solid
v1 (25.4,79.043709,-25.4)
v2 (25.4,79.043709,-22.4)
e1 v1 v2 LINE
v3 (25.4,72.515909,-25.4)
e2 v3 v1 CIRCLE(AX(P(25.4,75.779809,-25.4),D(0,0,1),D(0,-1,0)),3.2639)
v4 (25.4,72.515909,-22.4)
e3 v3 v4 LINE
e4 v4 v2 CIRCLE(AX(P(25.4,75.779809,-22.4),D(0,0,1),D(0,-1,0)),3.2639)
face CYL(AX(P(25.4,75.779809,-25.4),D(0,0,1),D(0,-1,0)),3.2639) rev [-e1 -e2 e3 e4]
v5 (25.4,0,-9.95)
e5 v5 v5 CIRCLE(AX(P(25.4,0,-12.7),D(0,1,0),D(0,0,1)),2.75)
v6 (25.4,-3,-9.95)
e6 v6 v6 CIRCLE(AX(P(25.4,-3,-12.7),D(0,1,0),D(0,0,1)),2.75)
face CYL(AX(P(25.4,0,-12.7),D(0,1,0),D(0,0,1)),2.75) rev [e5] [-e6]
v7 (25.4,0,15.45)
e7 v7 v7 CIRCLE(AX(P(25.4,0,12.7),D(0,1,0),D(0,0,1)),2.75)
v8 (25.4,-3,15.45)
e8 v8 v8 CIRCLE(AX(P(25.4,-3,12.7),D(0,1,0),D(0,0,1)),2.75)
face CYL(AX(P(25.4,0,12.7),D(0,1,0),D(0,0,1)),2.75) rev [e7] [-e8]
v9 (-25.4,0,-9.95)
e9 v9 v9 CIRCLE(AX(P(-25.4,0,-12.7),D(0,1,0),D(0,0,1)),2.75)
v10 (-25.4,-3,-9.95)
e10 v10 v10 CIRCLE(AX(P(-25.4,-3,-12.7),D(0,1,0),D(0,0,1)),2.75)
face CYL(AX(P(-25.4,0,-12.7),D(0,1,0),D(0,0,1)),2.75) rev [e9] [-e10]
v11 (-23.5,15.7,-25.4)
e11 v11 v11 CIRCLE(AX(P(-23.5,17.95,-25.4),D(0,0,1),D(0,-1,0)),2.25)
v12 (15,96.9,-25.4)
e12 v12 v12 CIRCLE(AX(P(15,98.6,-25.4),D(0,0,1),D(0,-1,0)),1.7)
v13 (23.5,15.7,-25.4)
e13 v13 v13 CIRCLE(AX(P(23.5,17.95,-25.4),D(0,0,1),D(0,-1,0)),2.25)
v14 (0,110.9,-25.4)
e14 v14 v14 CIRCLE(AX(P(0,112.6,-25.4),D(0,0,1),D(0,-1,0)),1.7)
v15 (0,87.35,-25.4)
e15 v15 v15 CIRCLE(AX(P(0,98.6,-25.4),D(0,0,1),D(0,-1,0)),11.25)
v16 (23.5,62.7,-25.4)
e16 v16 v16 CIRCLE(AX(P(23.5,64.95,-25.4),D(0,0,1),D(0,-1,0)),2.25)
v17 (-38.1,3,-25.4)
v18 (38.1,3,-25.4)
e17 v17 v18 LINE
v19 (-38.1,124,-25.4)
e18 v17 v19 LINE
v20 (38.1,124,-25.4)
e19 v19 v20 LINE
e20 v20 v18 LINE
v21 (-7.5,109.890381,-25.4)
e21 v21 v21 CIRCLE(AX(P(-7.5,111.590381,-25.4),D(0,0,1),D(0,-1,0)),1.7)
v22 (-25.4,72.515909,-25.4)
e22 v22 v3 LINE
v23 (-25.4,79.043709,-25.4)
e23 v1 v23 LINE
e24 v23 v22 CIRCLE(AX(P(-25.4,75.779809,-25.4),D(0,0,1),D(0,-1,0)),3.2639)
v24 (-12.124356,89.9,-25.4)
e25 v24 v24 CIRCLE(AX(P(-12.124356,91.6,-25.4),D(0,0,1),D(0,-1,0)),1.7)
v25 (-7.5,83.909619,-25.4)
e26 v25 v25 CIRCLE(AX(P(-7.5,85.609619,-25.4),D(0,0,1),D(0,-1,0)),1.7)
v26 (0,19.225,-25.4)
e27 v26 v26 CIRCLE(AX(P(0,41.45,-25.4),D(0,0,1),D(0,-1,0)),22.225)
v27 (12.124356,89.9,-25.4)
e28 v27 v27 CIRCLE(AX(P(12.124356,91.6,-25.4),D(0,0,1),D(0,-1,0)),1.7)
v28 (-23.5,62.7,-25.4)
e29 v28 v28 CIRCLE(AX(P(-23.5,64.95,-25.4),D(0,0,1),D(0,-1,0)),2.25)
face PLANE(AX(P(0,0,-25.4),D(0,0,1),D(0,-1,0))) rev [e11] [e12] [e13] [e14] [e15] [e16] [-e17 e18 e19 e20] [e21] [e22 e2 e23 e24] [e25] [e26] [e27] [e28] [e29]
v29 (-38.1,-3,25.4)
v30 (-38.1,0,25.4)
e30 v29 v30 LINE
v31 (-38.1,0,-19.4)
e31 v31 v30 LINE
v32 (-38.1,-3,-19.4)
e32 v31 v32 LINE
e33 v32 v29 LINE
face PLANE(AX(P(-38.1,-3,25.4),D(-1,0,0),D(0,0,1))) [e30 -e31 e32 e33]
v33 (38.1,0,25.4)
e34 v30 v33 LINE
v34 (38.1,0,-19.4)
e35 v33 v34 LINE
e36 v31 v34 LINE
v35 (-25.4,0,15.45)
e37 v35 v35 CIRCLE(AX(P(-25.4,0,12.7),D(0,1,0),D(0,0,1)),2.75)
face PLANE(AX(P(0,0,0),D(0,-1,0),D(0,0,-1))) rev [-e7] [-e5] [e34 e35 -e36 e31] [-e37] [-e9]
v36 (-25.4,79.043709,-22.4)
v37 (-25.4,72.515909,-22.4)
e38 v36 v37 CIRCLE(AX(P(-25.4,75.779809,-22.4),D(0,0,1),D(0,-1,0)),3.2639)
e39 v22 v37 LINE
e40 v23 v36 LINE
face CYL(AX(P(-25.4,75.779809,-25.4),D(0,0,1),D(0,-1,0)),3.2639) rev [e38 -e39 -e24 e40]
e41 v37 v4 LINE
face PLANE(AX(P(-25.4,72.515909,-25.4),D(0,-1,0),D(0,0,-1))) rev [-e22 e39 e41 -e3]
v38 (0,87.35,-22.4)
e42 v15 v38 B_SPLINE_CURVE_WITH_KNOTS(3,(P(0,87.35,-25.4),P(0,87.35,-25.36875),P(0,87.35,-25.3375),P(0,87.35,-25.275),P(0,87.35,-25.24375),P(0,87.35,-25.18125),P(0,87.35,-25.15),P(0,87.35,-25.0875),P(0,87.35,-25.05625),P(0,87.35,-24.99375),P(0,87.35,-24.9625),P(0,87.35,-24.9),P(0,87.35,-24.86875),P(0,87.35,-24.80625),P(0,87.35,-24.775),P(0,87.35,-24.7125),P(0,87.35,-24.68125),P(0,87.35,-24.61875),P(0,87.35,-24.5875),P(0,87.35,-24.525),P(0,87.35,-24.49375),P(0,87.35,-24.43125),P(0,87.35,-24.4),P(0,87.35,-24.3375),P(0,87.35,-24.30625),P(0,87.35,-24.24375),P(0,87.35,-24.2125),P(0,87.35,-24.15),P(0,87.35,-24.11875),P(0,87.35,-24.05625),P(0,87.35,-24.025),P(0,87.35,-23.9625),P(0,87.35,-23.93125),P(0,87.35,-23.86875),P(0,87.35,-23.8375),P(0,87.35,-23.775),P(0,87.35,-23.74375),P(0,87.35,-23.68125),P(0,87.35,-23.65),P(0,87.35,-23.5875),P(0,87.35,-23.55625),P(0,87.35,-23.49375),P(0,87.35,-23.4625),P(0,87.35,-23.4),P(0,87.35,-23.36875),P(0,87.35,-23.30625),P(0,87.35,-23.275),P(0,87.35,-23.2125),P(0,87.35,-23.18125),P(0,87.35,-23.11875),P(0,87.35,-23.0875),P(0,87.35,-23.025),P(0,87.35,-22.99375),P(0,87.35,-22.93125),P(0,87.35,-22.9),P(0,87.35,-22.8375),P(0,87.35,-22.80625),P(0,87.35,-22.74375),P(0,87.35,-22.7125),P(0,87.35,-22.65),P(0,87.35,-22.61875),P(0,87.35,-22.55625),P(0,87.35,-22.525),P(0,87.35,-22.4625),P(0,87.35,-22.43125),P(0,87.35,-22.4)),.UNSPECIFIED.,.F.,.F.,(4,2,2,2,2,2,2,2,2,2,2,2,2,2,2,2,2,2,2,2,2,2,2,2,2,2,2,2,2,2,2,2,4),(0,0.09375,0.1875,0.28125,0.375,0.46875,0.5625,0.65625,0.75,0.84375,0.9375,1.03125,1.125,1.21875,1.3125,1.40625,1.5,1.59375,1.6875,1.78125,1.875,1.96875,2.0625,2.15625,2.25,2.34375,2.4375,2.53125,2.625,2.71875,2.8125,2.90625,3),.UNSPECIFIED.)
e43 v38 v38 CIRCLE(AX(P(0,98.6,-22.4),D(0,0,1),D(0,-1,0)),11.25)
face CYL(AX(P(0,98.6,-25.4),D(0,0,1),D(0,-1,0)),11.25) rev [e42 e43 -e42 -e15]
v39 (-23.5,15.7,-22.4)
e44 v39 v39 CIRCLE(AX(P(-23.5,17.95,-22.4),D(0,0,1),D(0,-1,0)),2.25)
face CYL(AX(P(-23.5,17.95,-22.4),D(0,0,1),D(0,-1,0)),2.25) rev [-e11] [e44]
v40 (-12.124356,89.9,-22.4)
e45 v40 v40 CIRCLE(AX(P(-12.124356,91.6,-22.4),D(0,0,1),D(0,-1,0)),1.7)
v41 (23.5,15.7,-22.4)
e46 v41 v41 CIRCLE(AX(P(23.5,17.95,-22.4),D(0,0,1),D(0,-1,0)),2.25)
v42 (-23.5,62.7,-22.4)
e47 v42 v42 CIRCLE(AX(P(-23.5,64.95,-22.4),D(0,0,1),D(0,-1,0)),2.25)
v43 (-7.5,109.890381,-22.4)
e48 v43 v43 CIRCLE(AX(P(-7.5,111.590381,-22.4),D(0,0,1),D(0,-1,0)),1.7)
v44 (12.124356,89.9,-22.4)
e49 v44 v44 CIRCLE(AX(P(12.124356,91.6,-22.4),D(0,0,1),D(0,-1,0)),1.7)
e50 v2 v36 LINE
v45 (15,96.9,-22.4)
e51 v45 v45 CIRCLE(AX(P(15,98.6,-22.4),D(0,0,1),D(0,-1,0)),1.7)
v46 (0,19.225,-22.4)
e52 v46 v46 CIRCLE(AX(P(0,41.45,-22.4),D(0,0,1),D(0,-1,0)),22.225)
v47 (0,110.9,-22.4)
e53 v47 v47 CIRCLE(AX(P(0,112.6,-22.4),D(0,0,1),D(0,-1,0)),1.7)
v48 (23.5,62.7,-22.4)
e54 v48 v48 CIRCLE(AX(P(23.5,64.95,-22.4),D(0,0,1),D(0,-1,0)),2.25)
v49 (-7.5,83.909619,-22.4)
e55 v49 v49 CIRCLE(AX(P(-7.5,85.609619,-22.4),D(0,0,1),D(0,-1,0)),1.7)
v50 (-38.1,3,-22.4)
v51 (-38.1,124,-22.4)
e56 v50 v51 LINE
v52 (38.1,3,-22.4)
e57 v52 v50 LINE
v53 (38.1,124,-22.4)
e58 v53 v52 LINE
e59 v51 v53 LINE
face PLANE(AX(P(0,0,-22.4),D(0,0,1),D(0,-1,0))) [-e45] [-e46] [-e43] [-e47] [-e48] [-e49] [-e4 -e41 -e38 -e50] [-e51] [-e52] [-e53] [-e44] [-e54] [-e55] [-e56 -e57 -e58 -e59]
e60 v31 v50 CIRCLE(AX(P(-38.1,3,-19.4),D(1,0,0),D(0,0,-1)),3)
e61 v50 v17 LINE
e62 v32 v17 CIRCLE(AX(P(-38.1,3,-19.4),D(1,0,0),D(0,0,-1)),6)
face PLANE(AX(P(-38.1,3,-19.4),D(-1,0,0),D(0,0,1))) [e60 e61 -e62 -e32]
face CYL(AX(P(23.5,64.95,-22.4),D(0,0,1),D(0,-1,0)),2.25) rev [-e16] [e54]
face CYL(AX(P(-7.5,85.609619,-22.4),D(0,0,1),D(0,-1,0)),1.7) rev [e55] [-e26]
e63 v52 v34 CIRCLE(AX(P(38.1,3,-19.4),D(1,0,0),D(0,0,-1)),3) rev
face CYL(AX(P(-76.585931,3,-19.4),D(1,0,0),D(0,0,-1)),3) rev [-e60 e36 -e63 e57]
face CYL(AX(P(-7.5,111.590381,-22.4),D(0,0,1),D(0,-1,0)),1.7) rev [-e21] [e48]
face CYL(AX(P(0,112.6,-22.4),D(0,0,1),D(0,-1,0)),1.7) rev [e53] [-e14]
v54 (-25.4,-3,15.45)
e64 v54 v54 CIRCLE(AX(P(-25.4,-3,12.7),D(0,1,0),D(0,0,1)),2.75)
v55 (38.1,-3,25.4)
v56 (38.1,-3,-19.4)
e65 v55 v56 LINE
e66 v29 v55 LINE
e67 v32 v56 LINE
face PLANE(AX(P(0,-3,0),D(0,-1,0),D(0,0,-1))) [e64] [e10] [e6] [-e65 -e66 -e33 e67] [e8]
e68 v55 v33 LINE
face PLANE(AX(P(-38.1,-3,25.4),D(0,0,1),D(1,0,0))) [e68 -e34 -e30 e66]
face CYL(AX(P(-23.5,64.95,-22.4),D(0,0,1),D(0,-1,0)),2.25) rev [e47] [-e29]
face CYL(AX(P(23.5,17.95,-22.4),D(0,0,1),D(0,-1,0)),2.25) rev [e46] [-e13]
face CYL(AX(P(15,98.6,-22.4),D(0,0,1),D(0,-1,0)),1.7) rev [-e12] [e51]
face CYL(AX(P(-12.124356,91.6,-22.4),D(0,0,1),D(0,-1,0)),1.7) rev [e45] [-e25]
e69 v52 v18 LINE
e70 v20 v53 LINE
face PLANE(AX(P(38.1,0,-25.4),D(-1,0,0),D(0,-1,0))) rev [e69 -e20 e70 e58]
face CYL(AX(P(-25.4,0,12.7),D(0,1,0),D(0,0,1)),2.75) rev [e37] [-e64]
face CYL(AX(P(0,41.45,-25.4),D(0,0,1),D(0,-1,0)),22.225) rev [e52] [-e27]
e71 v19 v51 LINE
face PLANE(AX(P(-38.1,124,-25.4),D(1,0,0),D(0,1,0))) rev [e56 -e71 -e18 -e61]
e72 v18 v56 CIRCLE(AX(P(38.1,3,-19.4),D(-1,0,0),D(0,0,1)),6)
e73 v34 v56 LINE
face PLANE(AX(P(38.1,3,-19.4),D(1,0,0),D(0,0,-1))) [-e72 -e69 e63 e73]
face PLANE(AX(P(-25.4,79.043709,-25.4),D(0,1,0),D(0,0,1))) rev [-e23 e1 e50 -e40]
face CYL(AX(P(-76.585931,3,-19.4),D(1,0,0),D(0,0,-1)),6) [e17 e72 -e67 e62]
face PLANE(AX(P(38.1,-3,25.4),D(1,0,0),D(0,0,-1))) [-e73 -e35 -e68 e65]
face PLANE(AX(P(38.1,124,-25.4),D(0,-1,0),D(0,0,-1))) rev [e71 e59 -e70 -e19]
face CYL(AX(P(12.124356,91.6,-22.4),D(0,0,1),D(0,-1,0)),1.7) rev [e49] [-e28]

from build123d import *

# Parameters (mm, degrees)
SKETCH1_W                    = 76.2
SKETCH1_H                    = 50.8
BASE_FLANGE1_DEPTH           = 3
EDGE_FLANGE1_STRIP_W         = 18
EDGE_FLANGE1_STRIP_H         = 3
EDGE_FLANGE1_STRIP_CUT_DEPTH = 76.2
EDGE_FLANGE1_DEPTH           = 76.2
UNFOLD1_START                = -38.1
UNFOLD1_DEPTH                = 76.2
UNFOLD1_2_DEPTH              = 76.2
M5_CLEARANCE_HOLE1_D         = 5.5
M4_CLEARANCE_HOLE1_D         = 4.5
SKETCH15_R                   = 22.225
CUT_EXTRUDE1_DEPTH           = 153.340385686
M3_CLEARANCE_HOLE1_D         = 3.4
CIRPATTERN1_COUNT            = 3
SKETCH19_R                   = 11.25
CUT_EXTRUDE2_DEPTH           = 153.340385686
FOLD1_START                  = -147.468583471
FOLD1_OUTLINE_W              = 76.2
FOLD1_OUTLINE_H              = 3
FOLD1_DEPTH                  = 122.685023471
FOLD1_START_2                = -22.41644
FOLD1_2_OUTLINE_W            = 76.2
FOLD1_2_OUTLINE_H            = 124
FOLD1_2_OUTLINE_R            = 2.25
FOLD1_2_OUTLINE_R_2          = 22.225
FOLD1_2_OUTLINE_R_3          = 1.7
FOLD1_2_OUTLINE_R_4          = 11.25
FOLD1_2_DEPTH                = 0.01644
FOLD1_START_3                = -25.4
FOLD1_3_OUTLINE_W            = 76.2
FOLD1_3_OUTLINE_H            = 124
FOLD1_3_OUTLINE_R            = 2.25
FOLD1_3_OUTLINE_R_2          = 22.225
FOLD1_3_OUTLINE_R_3          = 1.7
FOLD1_3_OUTLINE_R_4          = 11.25
FOLD1_3_DEPTH                = 6
FOLD1_START_4                = -38.1
FOLD1_4_DEPTH                = 76.2


with BuildPart() as part:
    # Base-Flange1: sheet metal written as solids
    # Sketch1 → Base-Flange1 (new body)
    with BuildSketch(Plane(origin=(0, 0, 0), x_dir=(1, 0, 0), z_dir=(0, 1, 0))):
        Rectangle(SKETCH1_W, SKETCH1_H)
    extrude(amount=-BASE_FLANGE1_DEPTH)

    # Edge-Flange1: sheet metal written as solids
    # Edge-Flange1 strip (on a plane across the edge) → Edge-Flange1 strip cut (cut)
    with BuildSketch(Plane(origin=(38.1, 0, -25.4), x_dir=(0, 0, 1), z_dir=(-1, 0, 0))):
        with Locations((-3, -1.5)):
            Rectangle(EDGE_FLANGE1_STRIP_W, EDGE_FLANGE1_STRIP_H)
    extrude(amount=EDGE_FLANGE1_STRIP_CUT_DEPTH, mode=Mode.SUBTRACT)

    # Edge-Flange1 section (on a plane across the edge) → Edge-Flange1 (add)
    with BuildSketch(Plane(origin=(38.1, 0, -25.4), x_dir=(0, 0, 1), z_dir=(-1, 0, 0))):
        with BuildLine():
            Line((0, 3), (0, 124))
            Line((0, 124), (3, 124))
            Line((3, 124), (3, 3))
            ThreePointArc((3, 3), (3.878679656, 0.878679656), (6, 0))
            Line((6, 0), (6, -3))
            ThreePointArc((6, -3), (1.757359313, -1.242640687), (0, 3))
        make_face()
    extrude(amount=EDGE_FLANGE1_DEPTH)

    # Unfold1: read off the stored shape, not the designer's step
    # Unfold1 outline → Unfold1 (cut)
    with BuildSketch(Plane.YZ.offset(UNFOLD1_START)):
        with BuildLine():
            Line((0, -19.4), (0, -24.596152423))
            ThreePointArc((0, -24.596152423), (1.447085729, -25.195554958), (3, -25.4))
            Line((3, -25.4), (124, -25.4))
            Line((124, -25.4), (124, -22.4))
            Line((124, -22.4), (3, -22.4))
            ThreePointArc((3, -22.4), (0.878679656, -21.521320344), (0, -19.4))
        make_face()
    extrude(amount=UNFOLD1_DEPTH, mode=Mode.SUBTRACT)

    # Unfold1 2 outline → Unfold1 2 (add)
    with BuildSketch(Plane.YZ.offset(UNFOLD1_START)):
        with BuildLine():
            Line((-3, -19.4), (-3, -147.468583471))
            Line((-3, -147.468583471), (0, -147.468583471))
            Line((0, -147.468583471), (0, -24.596152423))
            ThreePointArc((0, -24.596152423), (-2.196152423, -22.4), (-3, -19.4))
        make_face()
    extrude(amount=UNFOLD1_2_DEPTH)

    # M5 Clearance Hole1 (through all)
    with Locations(Plane(origin=(0, 0, 0), x_dir=(1, 0, 0), z_dir=(0, 1, 0))):
        with Locations((-25.4, 12.7), (-25.4, -12.7), (25.4, -12.7), (25.4, 12.7)):
            Hole(M5_CLEARANCE_HOLE1_D / 2)

    # M4 Clearance Hole1 (through all)
    with Locations(Plane(origin=(0, 0, 0), x_dir=(1, 0, 0), z_dir=(0, 1, 0))):
        with Locations((-23.5, 41.418583471), (23.5, 88.418583471), (-23.5, 88.418583471), (23.5, 41.418583471)):
            Hole(M4_CLEARANCE_HOLE1_D / 2)

    # Sketch15 → Cut-Extrude1 (cut, through all)
    with BuildSketch(Plane(origin=(0, 0, 0), x_dir=(1, 0, 0), z_dir=(0, 1, 0))):
        with Locations(Location((0, 64.918583471, 0), (0, 0, 270))):
            Circle(SKETCH15_R)
    extrude(amount=-CUT_EXTRUDE1_DEPTH, mode=Mode.SUBTRACT)

    # M3 Clearance Hole1 (through all)
    with Locations(Plane(origin=(0, 0, 0), x_dir=(1, 0, 0), z_dir=(0, 1, 0))):
        with Locations((0, 136.068583471), (-7.5, 135.058964527)):
            m3_clearance_hole1 = Hole(M3_CLEARANCE_HOLE1_D / 2)

    # CirPattern1: M3 Clearance Hole1 ×3 about axis
    cirpattern1_axis = Axis((0, 0, -122.068583471), (0, 1, 0))
    for i in range(1, CIRPATTERN1_COUNT):
        add(m3_clearance_hole1.rotate(cirpattern1_axis, i * 360 / CIRPATTERN1_COUNT), mode=Mode.SUBTRACT)

    # Sketch19 → Cut-Extrude2 (cut, through all)
    with BuildSketch(Plane(origin=(0, 0, 0), x_dir=(1, 0, 0), z_dir=(0, 1, 0))):
        with Locations(Location((0, 122.068583471, 0), (0, 0, 270))):
            Circle(SKETCH19_R)
        with BuildLine():
            Line((-25.4, 102.512292942), (25.4, 102.512292942))
            ThreePointArc((25.4, 102.512292942), (28.6639, 99.248392942), (25.4, 95.984492942))
            Line((25.4, 95.984492942), (-25.4, 95.984492942))
            ThreePointArc((-25.4, 95.984492942), (-28.6639, 99.248392942), (-25.4, 102.512292942))
        make_face()
    extrude(amount=-CUT_EXTRUDE2_DEPTH, mode=Mode.SUBTRACT)

    # Fold1: read off the stored shape, not the designer's step
    # Fold1 outline → Fold1 (cut)
    with BuildSketch(Plane.XY.offset(FOLD1_START)):
        with Locations((0, -1.5)):
            Rectangle(FOLD1_OUTLINE_W, FOLD1_OUTLINE_H)
    extrude(amount=FOLD1_DEPTH, mode=Mode.SUBTRACT)

    # Fold1 2 outline → Fold1 2 (add)
    with BuildSketch(Plane.XY.offset(FOLD1_START_2)):
        with Locations((0, 62)):
            Rectangle(FOLD1_2_OUTLINE_W, FOLD1_2_OUTLINE_H)
        with Locations((-23.5, 17.95)):
            Circle(FOLD1_2_OUTLINE_R, mode=Mode.SUBTRACT)
        with Locations((23.5, 17.95)):
            Circle(FOLD1_2_OUTLINE_R, mode=Mode.SUBTRACT)
        with Locations((0, 41.45)):
            Circle(FOLD1_2_OUTLINE_R_2, mode=Mode.SUBTRACT)
        with Locations((-23.5, 64.95)):
            Circle(FOLD1_2_OUTLINE_R, mode=Mode.SUBTRACT)
        with Locations((-12.124355653, 91.6)):
            Circle(FOLD1_2_OUTLINE_R_3, mode=Mode.SUBTRACT)
        with Locations((-7.5, 85.609618943)):
            Circle(FOLD1_2_OUTLINE_R_3, mode=Mode.SUBTRACT)
        with Locations((-7.5, 111.590381057)):
            Circle(FOLD1_2_OUTLINE_R_3, mode=Mode.SUBTRACT)
        with BuildLine():
            ThreePointArc((-25.4, 72.515909472), (-28.6639, 75.779809472), (-25.4, 79.043709472))
            Line((-25.4, 79.043709472), (25.4, 79.043709472))
            ThreePointArc((25.4, 79.043709472), (28.6639, 75.779809472), (25.4, 72.515909472))
            Line((25.4, 72.515909472), (-25.4, 72.515909472))
        make_face(mode=Mode.SUBTRACT)
        with Locations((12.124355653, 91.6)):
            Circle(FOLD1_2_OUTLINE_R_3, mode=Mode.SUBTRACT)
        with Locations((23.5, 64.95)):
            Circle(FOLD1_2_OUTLINE_R, mode=Mode.SUBTRACT)
        with Locations((0, 98.6)):
            Circle(FOLD1_2_OUTLINE_R_4, mode=Mode.SUBTRACT)
        with Locations((15, 98.6)):
            Circle(FOLD1_2_OUTLINE_R_3, mode=Mode.SUBTRACT)
        with Locations((0, 112.6)):
            Circle(FOLD1_2_OUTLINE_R_3, mode=Mode.SUBTRACT)
    extrude(amount=FOLD1_2_DEPTH)

    # Fold1 3 outline → Fold1 3 (add)
    with BuildSketch(Plane.XY.offset(FOLD1_START_3)):
        with Locations((0, 62)):
            Rectangle(FOLD1_3_OUTLINE_W, FOLD1_3_OUTLINE_H)
        with Locations((-23.5, 17.95)):
            Circle(FOLD1_3_OUTLINE_R, mode=Mode.SUBTRACT)
        with Locations((23.5, 17.95)):
            Circle(FOLD1_3_OUTLINE_R, mode=Mode.SUBTRACT)
        with Locations((0, 41.45)):
            Circle(FOLD1_3_OUTLINE_R_2, mode=Mode.SUBTRACT)
        with Locations((-23.5, 64.95)):
            Circle(FOLD1_3_OUTLINE_R, mode=Mode.SUBTRACT)
        with Locations((-12.124355653, 91.6)):
            Circle(FOLD1_3_OUTLINE_R_3, mode=Mode.SUBTRACT)
        with Locations((-7.5, 85.609618943)):
            Circle(FOLD1_3_OUTLINE_R_3, mode=Mode.SUBTRACT)
        with Locations((-7.5, 111.590381057)):
            Circle(FOLD1_3_OUTLINE_R_3, mode=Mode.SUBTRACT)
        with BuildLine():
            ThreePointArc((-25.4, 72.515909472), (-28.6639, 75.779809472), (-25.4, 79.043709472))
            Line((-25.4, 79.043709472), (25.4, 79.043709472))
            ThreePointArc((25.4, 79.043709472), (28.6639, 75.779809472), (25.4, 72.515909472))
            Line((25.4, 72.515909472), (-25.4, 72.515909472))
        make_face(mode=Mode.SUBTRACT)
        with Locations((12.124355653, 91.6)):
            Circle(FOLD1_3_OUTLINE_R_3, mode=Mode.SUBTRACT)
        with Locations((23.5, 64.95)):
            Circle(FOLD1_3_OUTLINE_R, mode=Mode.SUBTRACT)
        with Locations((0, 98.6)):
            Circle(FOLD1_3_OUTLINE_R_4, mode=Mode.SUBTRACT)
        with Locations((15, 98.6)):
            Circle(FOLD1_3_OUTLINE_R_3, mode=Mode.SUBTRACT)
        with Locations((0, 112.6)):
            Circle(FOLD1_3_OUTLINE_R_3, mode=Mode.SUBTRACT)
    extrude(amount=FOLD1_3_DEPTH)

    # Fold1 4 outline → Fold1 4 (cut)
    with BuildSketch(Plane.YZ.offset(FOLD1_START_4)):
        with BuildLine():
            Line((124, -22.4), (124, -19.4))
            Line((124, -19.4), (0, -19.4))
            ThreePointArc((0, -19.4), (0.878679656, -21.521320344), (3, -22.4))
            Line((3, -22.4), (124, -22.4))
        make_face()
        with BuildLine():
            Line((0, -25.4), (3, -25.4))
            ThreePointArc((3, -25.4), (-1.242640687, -23.642640687), (-3, -19.4))
            Line((-3, -19.4), (-3, -24.78356))
            Line((-3, -24.78356), (0, -24.78356))
            Line((0, -24.78356), (0, -25.4))
        make_face()
    extrude(amount=FOLD1_4_DEPTH, mode=Mode.SUBTRACT)


solid = part.part
